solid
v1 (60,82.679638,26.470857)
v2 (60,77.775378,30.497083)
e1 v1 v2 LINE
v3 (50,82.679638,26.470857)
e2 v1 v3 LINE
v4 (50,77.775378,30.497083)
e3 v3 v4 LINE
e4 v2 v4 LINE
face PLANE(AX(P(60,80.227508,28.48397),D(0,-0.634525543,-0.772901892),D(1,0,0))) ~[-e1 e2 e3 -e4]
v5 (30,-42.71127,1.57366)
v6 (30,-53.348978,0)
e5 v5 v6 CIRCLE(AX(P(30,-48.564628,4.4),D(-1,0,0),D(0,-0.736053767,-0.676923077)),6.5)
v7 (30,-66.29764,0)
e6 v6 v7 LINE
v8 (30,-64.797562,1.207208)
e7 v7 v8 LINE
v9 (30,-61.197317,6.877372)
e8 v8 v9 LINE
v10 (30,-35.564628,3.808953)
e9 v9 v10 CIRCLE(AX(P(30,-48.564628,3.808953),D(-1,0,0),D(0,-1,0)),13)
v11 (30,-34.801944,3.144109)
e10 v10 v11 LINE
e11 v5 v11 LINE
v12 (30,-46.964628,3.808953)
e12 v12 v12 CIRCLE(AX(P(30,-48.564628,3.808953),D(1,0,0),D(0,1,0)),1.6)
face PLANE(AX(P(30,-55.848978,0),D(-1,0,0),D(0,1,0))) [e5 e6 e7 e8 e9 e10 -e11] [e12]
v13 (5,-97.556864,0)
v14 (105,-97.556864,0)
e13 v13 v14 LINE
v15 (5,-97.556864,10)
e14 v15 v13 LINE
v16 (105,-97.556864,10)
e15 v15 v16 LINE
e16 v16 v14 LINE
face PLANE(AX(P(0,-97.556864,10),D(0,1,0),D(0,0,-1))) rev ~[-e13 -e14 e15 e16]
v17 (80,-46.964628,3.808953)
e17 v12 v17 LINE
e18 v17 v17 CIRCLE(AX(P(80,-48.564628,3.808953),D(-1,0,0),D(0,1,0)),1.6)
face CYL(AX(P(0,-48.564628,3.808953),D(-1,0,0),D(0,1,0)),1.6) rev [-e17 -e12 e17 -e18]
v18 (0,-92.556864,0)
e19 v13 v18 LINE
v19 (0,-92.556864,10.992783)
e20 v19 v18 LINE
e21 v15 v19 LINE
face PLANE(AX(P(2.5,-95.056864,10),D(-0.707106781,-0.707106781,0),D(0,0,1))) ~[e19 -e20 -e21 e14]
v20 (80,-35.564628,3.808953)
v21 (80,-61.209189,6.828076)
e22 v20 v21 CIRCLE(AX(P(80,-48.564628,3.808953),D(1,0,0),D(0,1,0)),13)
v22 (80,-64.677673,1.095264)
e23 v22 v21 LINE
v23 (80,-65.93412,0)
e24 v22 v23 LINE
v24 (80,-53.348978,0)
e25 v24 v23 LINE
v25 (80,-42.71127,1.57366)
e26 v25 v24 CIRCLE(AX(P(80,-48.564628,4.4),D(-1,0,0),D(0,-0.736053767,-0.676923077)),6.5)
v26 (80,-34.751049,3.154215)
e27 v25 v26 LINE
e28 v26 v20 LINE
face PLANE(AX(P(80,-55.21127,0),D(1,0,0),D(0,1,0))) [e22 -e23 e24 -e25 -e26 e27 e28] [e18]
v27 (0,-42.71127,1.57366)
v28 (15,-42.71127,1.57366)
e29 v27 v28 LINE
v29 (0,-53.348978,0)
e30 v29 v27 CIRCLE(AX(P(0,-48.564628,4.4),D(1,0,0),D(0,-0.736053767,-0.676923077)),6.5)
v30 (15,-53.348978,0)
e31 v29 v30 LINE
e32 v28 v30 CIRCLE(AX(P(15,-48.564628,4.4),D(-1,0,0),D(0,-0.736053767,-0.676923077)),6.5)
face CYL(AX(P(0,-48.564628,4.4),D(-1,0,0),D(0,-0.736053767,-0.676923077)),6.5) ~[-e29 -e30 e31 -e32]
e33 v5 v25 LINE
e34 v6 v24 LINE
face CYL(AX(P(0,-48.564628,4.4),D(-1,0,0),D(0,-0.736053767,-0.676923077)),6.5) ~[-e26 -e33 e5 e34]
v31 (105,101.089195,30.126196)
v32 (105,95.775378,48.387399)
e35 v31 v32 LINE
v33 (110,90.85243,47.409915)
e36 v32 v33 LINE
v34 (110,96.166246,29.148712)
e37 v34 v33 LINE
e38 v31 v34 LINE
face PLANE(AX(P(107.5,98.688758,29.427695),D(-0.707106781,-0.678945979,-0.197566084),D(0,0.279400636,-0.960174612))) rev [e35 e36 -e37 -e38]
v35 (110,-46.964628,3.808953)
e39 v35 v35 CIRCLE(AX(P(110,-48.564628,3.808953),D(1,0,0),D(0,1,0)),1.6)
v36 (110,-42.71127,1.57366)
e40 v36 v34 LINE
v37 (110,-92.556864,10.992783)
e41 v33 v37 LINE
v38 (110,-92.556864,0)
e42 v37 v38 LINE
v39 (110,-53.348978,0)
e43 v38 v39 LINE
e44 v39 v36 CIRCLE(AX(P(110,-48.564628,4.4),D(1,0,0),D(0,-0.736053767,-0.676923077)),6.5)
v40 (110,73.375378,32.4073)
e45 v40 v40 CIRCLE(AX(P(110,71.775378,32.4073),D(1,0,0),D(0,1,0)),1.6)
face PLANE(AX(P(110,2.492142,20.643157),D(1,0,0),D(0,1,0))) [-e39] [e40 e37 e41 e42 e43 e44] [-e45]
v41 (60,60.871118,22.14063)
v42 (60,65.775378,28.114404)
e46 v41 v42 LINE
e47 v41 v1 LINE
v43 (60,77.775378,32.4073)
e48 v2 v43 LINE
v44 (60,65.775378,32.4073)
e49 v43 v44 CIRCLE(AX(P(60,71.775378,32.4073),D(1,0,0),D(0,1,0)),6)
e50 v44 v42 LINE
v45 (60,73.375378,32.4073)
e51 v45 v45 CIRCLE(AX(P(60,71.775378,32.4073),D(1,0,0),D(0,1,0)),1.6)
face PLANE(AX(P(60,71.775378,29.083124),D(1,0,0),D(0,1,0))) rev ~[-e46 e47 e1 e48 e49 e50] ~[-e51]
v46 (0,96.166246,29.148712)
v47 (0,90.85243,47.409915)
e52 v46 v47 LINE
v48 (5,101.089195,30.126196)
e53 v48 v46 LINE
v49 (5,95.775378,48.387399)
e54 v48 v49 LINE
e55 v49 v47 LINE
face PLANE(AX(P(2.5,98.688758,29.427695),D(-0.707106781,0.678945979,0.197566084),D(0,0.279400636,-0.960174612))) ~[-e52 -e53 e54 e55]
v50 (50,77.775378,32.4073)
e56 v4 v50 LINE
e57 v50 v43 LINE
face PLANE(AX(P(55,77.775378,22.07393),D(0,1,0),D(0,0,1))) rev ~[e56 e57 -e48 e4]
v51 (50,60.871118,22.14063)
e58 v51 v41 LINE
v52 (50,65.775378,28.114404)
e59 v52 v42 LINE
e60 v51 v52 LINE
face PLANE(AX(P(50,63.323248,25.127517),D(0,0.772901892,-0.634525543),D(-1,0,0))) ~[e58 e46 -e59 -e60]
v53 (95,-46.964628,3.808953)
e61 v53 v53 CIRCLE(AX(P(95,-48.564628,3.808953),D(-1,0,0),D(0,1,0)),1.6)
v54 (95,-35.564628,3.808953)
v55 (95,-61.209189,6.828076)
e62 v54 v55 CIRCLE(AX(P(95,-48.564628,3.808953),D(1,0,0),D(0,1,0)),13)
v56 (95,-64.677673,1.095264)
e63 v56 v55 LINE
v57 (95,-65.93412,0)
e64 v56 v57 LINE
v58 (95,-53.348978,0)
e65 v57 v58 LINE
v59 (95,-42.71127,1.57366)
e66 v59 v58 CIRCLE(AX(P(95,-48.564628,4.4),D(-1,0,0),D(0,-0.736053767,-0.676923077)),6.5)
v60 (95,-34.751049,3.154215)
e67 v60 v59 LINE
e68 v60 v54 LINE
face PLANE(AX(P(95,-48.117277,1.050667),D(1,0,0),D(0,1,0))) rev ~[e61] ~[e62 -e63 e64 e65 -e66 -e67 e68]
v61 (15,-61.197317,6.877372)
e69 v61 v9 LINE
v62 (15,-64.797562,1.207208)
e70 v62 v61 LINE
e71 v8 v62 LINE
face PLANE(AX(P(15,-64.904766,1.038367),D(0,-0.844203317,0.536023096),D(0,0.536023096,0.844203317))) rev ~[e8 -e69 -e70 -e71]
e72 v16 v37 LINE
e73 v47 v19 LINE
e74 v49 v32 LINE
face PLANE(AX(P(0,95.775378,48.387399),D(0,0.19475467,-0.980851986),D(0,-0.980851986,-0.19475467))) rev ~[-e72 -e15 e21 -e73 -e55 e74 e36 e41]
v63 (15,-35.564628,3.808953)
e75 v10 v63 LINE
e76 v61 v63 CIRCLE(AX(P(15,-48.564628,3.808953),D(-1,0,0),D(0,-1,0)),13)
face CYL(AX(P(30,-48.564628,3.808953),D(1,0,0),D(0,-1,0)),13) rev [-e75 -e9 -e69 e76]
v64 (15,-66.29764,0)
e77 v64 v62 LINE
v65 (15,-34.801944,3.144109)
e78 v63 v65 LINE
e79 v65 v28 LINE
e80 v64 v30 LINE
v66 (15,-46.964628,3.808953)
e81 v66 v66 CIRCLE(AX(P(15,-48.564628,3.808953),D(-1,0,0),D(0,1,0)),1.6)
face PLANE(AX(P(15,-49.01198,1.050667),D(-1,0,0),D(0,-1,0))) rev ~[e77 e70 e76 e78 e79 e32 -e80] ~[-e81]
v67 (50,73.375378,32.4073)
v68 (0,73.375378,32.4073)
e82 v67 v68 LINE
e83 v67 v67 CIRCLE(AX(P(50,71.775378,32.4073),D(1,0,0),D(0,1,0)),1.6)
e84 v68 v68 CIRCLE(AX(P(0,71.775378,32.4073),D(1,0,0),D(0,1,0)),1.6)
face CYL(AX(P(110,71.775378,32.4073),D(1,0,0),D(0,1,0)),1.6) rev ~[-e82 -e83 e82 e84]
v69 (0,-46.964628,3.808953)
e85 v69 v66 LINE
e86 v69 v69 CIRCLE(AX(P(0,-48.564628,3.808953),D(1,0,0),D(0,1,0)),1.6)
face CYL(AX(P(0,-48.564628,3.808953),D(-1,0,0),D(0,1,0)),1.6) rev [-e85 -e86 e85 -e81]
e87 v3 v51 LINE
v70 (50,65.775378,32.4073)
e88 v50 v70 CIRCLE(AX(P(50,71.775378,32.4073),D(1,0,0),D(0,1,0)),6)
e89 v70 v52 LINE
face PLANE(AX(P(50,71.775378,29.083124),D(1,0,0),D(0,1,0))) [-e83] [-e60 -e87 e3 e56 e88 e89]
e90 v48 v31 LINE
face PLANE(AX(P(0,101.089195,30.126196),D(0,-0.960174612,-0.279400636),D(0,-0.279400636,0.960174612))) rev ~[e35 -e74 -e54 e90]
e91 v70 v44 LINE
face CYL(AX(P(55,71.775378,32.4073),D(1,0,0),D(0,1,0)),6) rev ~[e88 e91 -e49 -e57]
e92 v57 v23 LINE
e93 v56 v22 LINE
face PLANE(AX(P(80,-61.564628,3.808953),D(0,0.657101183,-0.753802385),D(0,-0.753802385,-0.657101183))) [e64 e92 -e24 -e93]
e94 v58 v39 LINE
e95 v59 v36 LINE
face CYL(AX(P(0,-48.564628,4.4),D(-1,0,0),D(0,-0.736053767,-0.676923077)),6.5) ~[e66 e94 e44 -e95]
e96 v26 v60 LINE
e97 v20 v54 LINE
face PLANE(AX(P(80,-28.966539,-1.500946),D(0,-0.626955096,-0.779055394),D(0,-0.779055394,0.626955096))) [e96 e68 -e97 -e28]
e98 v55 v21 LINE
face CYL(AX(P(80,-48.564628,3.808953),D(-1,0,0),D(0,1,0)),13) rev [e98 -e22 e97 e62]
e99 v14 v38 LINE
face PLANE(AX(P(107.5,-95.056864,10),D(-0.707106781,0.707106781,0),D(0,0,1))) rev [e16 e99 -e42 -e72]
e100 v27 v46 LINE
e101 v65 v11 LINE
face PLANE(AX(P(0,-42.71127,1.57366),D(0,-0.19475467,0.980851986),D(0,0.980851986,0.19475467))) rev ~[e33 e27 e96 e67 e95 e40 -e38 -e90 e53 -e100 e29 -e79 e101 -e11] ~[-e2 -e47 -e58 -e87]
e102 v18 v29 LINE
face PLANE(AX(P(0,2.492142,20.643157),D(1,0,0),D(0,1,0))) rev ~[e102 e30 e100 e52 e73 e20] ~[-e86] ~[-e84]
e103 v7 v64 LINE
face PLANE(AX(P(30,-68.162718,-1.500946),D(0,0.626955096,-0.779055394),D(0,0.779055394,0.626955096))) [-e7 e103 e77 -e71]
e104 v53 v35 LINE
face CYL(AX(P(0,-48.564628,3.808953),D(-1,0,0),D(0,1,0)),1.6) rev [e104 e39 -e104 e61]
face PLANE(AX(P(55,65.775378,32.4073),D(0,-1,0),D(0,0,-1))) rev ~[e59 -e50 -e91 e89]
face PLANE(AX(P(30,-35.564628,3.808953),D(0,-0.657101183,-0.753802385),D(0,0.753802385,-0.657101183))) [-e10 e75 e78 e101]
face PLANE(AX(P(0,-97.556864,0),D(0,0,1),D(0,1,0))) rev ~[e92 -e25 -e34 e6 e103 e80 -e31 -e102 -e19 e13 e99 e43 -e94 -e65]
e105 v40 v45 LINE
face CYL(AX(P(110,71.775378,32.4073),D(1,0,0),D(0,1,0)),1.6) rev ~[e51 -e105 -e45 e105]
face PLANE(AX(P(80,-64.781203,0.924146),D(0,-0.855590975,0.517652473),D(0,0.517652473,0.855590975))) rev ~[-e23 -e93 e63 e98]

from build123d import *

# Parameters (mm, degrees)
F1_R         = 1.6
F2_DEPTH     = 110
F3_W         = 15
F3_H         = 15
F4_DEPTH     = 10.5
F5_R         = 1.6
F6_DEPTH     = 15
F7_T1_DEPTH  = 15
F9_DEPTH     = 5
F10_R        = 1.6
F11_DEPTH    = 110.001
F12_SIZE     = 5
F13_SIZE     = 5
F14_SIZE     = 5
F15_R        = 1.6
F16_DEPTH    = 15
F17_T1_DEPTH = 15


# Not quite as in the source:
# - a fillet or chamfer that OpenCascade refuses, or shapes differently, is made with other operations: its cross-section is extruded or revolved along the edge and cut away or added
# - an extrude ends at something that could not be found from the text; its depth is read off the source's solid


with BuildPart() as f2:
    # F1 (on Right) → F2 (new body)
    with BuildSketch(Plane.YZ):
        with BuildLine():
            Line((-97.5568636432, 0), (-53.34897794, 0))
            ThreePointArc((-53.34897794, 0), (-47.6134207396, -2.0300236301), (-42.7112703662, 1.5736597709))
            Line((-42.7112703662, 1.5736597709), (101.0891949998, 30.1261963412))
            Line((101.0891949998, 30.1261963412), (95.775378419, 48.3873994959))
            Line((95.775378419, 48.3873994959), (-97.5568636432, 10))
            Line((-97.5568636432, 10), (-97.5568636432, 0))
        make_face()
        with Locations((-48.5646284544, 3.8089532984)):
            Circle(F1_R, mode=Mode.SUBTRACT)
    extrude(amount=F2_DEPTH)

    # F3 (on Top) → F4 (cut, symmetric)
    with BuildSketch(Plane.XY):
        with Locations((22.5, -48.34897794)):
            Rectangle(F3_W, F3_H)
        with Locations((87.5, -47.7112703662)):
            Rectangle(F3_W, F3_H)
    extrude(amount=F4_DEPTH, both=True, mode=Mode.SUBTRACT)

    # F5 (on face) → F6 (cut, through all)
    with BuildSketch(Plane.YZ.offset(80)):
        with BuildLine():
            Line((-28.9665386081, -1.5009464696), (-35.5646284544, 3.8089532984))
            ThreePointArc((-35.5646284544, 3.8089532984), (-48.5646284544, 16.8089532984), (-61.5646284544, 3.8089532984))
            Line((-61.5646284544, 3.8089532984), (-67.6559507847, -1.5009464696))
            Line((-67.6559507847, -1.5009464696), (-44.5721596479, -13.8469105586))
            Line((-44.5721596479, -13.8469105586), (-28.9665386081, -1.5009464696))
        make_face()
        with Locations((-48.5646284544, 3.8089532984)):
            Circle(F5_R, mode=Mode.SUBTRACT)
    extrude(amount=F6_DEPTH, mode=Mode.SUBTRACT)

    # F7: chamfer of 5 on 1 edges, made by hand

    # F7_s2 → F7_t1 (cut)
    with BuildSketch(Plane.YZ.offset(80)):
        with BuildLine():
            Line((-64.7812034248, 0.9241461465), (-61.1056580828, 6.9991937656))
            Line((-61.1056580828, 6.9991937656), (-61.0083922357, 6.9759697482))
            ThreePointArc((-61.0083922357, 6.9759697482), (-61.3651603236, 5.4078228571), (-61.4646284544, 3.8089532984))
            Line((-61.4646284544, 3.8089532984), (-61.4989183361, 3.7335730599))
            ThreePointArc((-61.4989183361, 3.7335730599), (-63.1272340331, 2.3141451142), (-64.7154933066, 0.848765908))
            Line((-64.7154933066, 0.848765908), (-64.7812034248, 0.9241461465))
        make_face()
    extrude(amount=F7_T1_DEPTH, mode=Mode.SUBTRACT)

    # F8 (on offset) → F9 (cut, symmetric)
    with BuildSketch(Plane.YZ.offset(55)):
        with BuildLine():
            Line((77.775378419, 22.0739301294), (77.775378419, 32.4073002482))
            ThreePointArc((77.775378419, 32.4073002482), (71.775378419, 38.4073002482), (65.775378419, 32.4073002482))
            Line((65.775378419, 32.4073002482), (65.775378419, 22.0739301294))
            Line((65.775378419, 22.0739301294), (77.775378419, 22.0739301294))
        make_face()
    extrude(amount=F9_DEPTH, both=True, mode=Mode.SUBTRACT)

    # F10 (on face) → F11 (cut, through all)
    with BuildSketch(Plane.YZ.offset(110)):
        with Locations((71.775378419, 32.4073002482)):
            Circle(F10_R)
    extrude(amount=-F11_DEPTH, mode=Mode.SUBTRACT)

    # F12
    f12_edges = [f2.edges().sort_by_distance(p)[0] for p in [
        (55, 77.775378, 25.497083),
    ]]
    chamfer(f12_edges, length=F12_SIZE)

    # F13
    f13_edges = [f2.edges().sort_by_distance(p)[0] for p in [
        (55, 65.775378, 23.114404),
    ]]
    chamfer(f13_edges, length=F13_SIZE)

    # F14
    f14_edges = [f2.edges().sort_by_distance(p)[0] for p in [
        (0, 98.432287, 39.256798),
        (110, 98.432287, 39.256798),
        (110, -97.556864, 5),
        (0, -97.556864, 5),
    ]]
    chamfer(f14_edges, length=F14_SIZE)

    # F15 (on face) → F16 (cut, through all)
    with BuildSketch(Plane(origin=(30, 0, 0), x_dir=(0, -1, 0), z_dir=(-1, 0, 0))):
        with BuildLine():
            Line((68.1627183007, -1.5009464696), (61.5646284544, 3.8089532984))
            ThreePointArc((61.5646284544, 3.8089532984), (48.5646284544, 16.8089532984), (35.5646284544, 3.8089532984))
            Line((35.5646284544, 3.8089532984), (29.4733061241, -1.5009464696))
            Line((29.4733061241, -1.5009464696), (52.5570972608, -13.8469105586))
            Line((52.5570972608, -13.8469105586), (68.1627183007, -1.5009464696))
        make_face()
        with Locations((48.5646284544, 3.8089532984)):
            Circle(F15_R, mode=Mode.SUBTRACT)
    extrude(amount=F16_DEPTH, mode=Mode.SUBTRACT)

    # F17: chamfer of 5 on 1 edges, made by hand

    # F17_s2 → F17_t1 (cut)
    with BuildSketch(Plane.YZ.offset(15)):
        with BuildLine():
            Line((-64.9047662945, 1.0383670147), (-61.0901119265, 7.0462123799))
            Line((-61.0901119265, 7.0462123799), (-60.9929374028, 7.0226091613))
            ThreePointArc((-60.9929374028, 7.0226091613), (-61.3621185428, 5.4319897848), (-61.4646284544, 3.8089532984))
            Line((-61.4646284544, 3.8089532984), (-61.5019329447, 3.731047759))
            ThreePointArc((-61.5019329447, 3.731047759), (-63.1921659154, 2.3708104982), (-64.8420707848, 0.9604614753))
            Line((-64.8420707848, 0.9604614753), (-64.9047662945, 1.0383670147))
        make_face()
    extrude(amount=F17_T1_DEPTH, mode=Mode.SUBTRACT)


solid = f2.part
